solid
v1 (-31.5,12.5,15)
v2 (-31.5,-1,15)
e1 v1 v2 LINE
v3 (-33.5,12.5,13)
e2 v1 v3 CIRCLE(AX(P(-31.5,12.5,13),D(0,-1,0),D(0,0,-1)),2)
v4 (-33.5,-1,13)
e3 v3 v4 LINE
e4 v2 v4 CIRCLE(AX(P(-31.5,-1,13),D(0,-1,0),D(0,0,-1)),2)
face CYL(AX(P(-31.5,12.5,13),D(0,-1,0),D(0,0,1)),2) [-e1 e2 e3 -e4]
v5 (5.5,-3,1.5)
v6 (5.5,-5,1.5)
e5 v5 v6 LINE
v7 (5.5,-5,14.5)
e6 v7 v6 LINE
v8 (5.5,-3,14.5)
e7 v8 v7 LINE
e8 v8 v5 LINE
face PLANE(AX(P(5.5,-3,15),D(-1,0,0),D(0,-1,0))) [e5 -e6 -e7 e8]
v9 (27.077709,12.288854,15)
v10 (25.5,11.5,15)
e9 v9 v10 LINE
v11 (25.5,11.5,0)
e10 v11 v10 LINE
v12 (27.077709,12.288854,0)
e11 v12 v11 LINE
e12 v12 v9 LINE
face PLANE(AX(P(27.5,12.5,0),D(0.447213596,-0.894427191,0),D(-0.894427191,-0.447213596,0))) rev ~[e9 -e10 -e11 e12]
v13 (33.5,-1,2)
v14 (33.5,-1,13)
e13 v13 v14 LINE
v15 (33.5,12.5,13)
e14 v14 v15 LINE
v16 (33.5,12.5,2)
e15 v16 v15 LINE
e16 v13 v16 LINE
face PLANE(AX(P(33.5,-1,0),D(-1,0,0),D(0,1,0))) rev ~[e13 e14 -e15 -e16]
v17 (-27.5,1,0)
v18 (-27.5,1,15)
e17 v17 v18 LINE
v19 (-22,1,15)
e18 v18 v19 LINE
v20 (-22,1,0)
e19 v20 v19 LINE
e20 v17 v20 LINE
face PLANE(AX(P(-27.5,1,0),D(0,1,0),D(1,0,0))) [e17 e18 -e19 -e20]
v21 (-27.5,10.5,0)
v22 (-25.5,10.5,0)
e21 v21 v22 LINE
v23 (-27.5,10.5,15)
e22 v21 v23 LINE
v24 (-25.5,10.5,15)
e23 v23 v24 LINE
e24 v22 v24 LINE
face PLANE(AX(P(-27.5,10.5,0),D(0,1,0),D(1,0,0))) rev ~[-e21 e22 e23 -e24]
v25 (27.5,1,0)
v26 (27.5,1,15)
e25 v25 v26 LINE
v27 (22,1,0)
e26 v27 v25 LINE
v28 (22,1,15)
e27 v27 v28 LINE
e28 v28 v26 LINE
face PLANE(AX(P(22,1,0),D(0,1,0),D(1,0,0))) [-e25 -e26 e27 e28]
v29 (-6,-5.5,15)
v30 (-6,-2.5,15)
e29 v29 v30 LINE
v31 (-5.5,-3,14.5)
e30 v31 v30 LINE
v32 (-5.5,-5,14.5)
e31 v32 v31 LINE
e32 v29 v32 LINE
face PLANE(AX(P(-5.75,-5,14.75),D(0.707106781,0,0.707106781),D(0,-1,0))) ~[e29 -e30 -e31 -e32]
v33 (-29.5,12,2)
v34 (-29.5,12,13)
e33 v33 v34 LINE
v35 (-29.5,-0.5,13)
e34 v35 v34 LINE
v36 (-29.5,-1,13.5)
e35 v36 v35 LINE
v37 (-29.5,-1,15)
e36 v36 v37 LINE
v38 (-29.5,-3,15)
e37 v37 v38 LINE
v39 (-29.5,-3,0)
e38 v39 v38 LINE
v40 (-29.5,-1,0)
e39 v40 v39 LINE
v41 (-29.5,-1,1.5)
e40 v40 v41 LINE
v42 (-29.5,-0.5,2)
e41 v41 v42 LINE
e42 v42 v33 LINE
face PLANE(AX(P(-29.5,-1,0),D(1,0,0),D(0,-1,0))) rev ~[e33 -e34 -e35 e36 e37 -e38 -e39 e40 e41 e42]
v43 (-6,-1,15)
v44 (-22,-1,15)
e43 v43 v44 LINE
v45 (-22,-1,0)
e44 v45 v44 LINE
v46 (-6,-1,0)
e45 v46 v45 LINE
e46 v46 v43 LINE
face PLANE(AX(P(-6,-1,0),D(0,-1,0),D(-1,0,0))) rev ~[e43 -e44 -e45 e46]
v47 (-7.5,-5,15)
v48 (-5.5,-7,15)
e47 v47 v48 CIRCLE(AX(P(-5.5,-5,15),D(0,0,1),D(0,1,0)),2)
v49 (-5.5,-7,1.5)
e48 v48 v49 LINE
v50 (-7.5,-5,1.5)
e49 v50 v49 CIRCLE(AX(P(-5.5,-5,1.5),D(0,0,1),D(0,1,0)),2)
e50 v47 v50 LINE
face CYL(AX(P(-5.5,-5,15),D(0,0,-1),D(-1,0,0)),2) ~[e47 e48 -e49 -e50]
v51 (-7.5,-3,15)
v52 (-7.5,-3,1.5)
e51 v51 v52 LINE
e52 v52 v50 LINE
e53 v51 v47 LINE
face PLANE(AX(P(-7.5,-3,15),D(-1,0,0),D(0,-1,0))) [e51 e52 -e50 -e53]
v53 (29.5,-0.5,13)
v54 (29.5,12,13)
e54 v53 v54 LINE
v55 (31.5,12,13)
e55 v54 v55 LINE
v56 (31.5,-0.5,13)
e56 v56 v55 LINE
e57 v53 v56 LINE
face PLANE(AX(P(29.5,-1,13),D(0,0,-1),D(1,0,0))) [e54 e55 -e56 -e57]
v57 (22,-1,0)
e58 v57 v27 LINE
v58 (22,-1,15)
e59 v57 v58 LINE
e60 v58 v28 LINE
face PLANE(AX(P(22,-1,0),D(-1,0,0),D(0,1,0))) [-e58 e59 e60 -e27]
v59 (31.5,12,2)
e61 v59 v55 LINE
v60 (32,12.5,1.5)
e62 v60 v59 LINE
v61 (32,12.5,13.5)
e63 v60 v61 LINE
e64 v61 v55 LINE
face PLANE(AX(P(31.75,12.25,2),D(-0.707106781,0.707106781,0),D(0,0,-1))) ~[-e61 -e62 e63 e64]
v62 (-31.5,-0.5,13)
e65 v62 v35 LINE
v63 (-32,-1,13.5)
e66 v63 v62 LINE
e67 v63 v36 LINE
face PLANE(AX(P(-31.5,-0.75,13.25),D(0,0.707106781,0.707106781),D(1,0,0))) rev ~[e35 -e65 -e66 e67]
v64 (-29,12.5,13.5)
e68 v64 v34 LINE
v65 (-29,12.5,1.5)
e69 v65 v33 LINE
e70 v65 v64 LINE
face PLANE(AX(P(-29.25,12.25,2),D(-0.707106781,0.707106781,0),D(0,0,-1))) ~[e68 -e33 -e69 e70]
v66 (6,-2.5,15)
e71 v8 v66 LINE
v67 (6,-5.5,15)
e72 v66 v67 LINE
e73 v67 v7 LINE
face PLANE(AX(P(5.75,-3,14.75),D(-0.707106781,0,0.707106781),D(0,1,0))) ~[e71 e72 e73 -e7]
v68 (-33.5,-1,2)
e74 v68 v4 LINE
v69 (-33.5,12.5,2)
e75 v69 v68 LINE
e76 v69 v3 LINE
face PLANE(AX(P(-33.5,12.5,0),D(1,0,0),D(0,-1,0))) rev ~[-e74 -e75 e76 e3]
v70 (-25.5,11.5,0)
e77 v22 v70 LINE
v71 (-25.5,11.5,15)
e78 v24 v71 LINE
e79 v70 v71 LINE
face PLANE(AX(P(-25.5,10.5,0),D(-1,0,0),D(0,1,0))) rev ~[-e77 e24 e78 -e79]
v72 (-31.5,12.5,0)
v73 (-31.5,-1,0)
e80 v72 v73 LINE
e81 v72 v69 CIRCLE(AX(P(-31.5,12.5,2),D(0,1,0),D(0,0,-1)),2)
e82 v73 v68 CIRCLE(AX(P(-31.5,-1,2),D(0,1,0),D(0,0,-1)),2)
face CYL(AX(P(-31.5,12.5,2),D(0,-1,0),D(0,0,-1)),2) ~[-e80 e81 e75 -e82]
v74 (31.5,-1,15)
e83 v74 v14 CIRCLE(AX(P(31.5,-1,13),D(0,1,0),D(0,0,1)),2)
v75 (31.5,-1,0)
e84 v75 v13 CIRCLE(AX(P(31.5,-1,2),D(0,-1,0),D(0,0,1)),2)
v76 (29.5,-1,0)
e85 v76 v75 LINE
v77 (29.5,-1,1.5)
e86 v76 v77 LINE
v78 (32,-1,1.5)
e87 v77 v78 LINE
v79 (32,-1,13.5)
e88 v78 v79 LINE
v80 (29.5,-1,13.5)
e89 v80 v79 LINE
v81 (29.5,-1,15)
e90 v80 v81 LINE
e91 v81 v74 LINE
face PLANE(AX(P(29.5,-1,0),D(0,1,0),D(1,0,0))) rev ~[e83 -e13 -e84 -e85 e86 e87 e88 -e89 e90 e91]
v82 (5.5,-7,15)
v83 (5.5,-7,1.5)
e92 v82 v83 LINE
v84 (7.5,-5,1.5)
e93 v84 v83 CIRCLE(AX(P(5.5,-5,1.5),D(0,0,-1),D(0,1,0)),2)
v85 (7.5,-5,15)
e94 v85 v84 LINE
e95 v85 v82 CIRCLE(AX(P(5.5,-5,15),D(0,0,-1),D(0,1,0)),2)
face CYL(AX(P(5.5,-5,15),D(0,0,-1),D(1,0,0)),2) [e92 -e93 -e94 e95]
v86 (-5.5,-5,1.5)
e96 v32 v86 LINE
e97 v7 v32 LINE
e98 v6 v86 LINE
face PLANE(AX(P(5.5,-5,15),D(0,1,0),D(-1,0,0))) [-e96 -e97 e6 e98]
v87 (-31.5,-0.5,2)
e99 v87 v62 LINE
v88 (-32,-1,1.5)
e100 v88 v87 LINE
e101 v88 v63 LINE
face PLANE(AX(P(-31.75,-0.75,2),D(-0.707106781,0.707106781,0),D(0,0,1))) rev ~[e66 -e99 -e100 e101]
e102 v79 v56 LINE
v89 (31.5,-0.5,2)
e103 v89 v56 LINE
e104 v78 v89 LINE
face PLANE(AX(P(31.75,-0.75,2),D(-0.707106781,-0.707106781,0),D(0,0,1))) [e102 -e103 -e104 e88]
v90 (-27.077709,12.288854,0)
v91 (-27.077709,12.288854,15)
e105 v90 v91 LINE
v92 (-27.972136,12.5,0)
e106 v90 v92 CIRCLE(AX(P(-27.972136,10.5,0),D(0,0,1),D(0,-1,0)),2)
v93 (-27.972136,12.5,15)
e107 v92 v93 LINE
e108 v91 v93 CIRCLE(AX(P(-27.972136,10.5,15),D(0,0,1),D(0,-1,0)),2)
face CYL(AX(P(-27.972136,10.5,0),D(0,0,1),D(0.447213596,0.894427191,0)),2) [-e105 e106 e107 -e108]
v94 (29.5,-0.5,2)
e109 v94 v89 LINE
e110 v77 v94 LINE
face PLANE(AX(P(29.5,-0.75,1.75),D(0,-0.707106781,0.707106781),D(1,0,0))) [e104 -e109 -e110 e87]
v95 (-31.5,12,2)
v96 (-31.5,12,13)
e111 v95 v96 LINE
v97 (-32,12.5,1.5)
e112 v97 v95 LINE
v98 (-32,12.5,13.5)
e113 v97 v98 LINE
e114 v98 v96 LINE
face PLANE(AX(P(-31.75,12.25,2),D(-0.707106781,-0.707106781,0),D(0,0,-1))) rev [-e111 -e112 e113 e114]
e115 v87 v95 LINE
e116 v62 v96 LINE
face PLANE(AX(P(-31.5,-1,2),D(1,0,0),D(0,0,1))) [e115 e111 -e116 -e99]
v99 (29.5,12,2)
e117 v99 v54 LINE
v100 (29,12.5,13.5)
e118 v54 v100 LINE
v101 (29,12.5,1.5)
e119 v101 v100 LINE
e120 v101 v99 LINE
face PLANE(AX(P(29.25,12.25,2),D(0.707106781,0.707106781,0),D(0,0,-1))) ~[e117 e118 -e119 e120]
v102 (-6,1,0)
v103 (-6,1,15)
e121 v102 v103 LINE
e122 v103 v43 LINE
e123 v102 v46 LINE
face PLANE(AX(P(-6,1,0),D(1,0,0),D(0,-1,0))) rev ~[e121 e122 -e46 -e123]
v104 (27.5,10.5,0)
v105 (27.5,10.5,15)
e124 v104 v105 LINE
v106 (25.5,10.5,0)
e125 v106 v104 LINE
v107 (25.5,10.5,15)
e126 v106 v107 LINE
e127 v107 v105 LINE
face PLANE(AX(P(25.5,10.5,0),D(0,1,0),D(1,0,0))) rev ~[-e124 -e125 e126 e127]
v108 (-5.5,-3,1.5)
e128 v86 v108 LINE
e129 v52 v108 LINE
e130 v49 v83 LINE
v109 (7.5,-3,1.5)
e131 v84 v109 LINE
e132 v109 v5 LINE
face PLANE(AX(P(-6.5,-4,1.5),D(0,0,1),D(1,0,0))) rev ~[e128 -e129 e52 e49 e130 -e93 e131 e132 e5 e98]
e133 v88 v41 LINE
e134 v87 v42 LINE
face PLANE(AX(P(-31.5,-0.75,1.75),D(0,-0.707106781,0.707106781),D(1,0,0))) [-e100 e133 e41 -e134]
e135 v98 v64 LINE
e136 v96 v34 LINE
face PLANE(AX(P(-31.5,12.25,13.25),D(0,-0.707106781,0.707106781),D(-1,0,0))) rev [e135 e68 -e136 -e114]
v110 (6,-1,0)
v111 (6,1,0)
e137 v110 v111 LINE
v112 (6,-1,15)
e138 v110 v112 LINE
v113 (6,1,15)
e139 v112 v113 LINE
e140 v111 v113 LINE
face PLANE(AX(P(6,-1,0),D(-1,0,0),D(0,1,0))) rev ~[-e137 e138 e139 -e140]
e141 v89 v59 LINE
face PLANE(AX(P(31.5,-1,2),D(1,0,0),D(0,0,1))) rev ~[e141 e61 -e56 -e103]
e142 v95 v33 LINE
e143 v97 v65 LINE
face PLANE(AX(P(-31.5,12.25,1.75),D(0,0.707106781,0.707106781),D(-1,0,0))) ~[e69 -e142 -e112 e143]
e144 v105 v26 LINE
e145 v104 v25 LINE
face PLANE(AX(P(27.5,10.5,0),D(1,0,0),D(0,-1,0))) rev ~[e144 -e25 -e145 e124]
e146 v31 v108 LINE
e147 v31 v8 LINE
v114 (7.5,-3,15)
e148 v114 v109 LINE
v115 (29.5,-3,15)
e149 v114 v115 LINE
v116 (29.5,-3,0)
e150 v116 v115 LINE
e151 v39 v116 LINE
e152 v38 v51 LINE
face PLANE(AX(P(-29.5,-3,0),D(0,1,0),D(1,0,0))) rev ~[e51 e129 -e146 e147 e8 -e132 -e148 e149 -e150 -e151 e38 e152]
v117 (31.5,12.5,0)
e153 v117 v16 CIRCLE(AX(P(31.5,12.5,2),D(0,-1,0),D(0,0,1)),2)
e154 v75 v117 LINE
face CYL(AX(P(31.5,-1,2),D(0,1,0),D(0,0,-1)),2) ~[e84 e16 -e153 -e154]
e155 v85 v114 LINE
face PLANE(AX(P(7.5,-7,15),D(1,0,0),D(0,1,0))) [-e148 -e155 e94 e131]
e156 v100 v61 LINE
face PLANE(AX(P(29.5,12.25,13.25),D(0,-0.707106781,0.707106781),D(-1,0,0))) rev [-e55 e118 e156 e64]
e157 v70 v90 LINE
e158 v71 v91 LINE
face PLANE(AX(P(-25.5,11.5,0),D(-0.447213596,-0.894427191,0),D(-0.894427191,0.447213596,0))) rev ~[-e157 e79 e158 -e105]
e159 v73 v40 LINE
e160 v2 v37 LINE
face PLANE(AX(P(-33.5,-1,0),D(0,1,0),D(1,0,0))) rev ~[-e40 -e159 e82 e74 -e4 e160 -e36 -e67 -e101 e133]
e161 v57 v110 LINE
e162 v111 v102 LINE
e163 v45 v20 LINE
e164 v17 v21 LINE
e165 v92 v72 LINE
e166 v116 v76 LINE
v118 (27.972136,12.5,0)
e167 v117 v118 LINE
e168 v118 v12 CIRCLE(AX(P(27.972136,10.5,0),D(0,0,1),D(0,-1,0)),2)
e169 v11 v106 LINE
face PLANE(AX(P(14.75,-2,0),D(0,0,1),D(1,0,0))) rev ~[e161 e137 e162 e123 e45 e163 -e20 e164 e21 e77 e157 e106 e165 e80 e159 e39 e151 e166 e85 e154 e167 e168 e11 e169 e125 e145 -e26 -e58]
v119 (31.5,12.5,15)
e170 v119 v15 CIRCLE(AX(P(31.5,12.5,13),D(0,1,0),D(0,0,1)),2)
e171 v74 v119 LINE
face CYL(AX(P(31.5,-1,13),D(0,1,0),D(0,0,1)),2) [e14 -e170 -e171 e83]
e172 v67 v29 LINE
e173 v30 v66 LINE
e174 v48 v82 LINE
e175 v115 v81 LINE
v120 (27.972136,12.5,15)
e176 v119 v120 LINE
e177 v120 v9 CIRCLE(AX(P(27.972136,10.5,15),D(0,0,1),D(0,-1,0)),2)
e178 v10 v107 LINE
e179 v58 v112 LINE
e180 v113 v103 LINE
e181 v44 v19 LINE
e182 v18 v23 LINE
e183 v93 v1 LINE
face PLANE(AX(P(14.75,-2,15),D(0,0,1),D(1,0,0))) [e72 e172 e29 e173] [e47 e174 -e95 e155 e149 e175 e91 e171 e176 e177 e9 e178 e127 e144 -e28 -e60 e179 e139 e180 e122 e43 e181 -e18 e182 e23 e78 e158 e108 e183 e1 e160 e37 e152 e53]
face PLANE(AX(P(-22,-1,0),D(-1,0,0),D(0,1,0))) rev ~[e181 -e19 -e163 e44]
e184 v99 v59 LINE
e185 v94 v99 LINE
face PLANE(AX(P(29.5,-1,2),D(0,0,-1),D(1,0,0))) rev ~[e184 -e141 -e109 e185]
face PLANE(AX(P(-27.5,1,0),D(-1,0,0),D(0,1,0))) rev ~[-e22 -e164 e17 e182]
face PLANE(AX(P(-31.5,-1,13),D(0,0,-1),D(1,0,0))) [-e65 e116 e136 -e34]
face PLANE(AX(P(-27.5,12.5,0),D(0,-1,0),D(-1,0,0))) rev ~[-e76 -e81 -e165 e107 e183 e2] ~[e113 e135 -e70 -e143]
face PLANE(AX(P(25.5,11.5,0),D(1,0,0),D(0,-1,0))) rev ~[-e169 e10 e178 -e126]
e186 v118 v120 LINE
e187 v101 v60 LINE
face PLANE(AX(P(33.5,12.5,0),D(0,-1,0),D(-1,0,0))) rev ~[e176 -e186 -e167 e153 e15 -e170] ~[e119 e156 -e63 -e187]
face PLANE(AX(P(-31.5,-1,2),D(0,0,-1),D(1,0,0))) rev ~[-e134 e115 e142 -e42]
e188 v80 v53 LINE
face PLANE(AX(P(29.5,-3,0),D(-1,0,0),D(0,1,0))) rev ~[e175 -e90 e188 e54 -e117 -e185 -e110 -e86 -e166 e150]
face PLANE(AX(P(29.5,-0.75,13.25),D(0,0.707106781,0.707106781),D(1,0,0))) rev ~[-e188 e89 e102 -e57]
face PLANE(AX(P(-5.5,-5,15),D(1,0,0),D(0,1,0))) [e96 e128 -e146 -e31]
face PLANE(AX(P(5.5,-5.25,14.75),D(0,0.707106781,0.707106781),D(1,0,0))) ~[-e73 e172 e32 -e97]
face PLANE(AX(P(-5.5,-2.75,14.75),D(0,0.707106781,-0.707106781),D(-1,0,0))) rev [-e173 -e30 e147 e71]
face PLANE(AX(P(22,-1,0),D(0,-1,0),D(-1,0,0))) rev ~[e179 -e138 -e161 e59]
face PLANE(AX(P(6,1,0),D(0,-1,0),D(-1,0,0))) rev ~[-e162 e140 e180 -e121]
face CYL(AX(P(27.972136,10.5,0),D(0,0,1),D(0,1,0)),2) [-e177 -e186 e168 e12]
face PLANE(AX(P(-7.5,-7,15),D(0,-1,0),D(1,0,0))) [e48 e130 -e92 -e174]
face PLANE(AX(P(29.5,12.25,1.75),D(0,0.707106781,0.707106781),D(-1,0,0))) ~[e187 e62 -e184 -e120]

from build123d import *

# Parameters (mm, degrees)
F0_W     = 5.5
F0_H     = 2
F1_DEPTH = 15
F2_W     = 2
F2_H     = 11
F3_DEPTH = 13.501
F4_W     = 2
F4_H     = 2
F5_DEPTH = 13.5
F6_R     = 2
F7_SIZE  = 0.5


with BuildPart() as f1:
    # F0 (on Top) → F1 (new body)
    with BuildSketch(Plane.XY):
        Polygon((29.5, -1), (27.5, -1), (22, -1), (6, -1), (0, -1), (0, -3), (29.5, -3), align=None)
        with Locations((24.75, 0)):
            Rectangle(F0_W, F0_H)
        Polygon((27.5, 1), (27.5, -1), (29.5, -1), (29.5, 10.5), (27.5, 10.5), align=None)
        Polygon((29.5, 10.5), (29.5, -1), (33.5, -1), (33.5, 12.5), (29.5, 12.5), align=None)
        Polygon((0, -1), (6, -1), (6, 1), (-6, 1), (-6, -1), align=None)
        Polygon((25.5, 10.5), (27.5, 10.5), (29.5, 10.5), (29.5, 12.5), (27.5, 12.5), (25.5, 11.5), align=None)
        Polygon((0, -3), (0, -1), (-6, -1), (-22, -1), (-27.5, -1), (-29.5, -1), (-29.5, -3), align=None)
        with Locations((-24.75, 0)):
            Rectangle(F0_W, F0_H)
        Polygon((-29.5, 10.5), (-29.5, -1), (-27.5, -1), (-27.5, 1), (-27.5, 10.5), align=None)
        Polygon((-33.5, -1), (-29.5, -1), (-29.5, 10.5), (-29.5, 12.5), (-33.5, 12.5), align=None)
        Polygon((-29.5, 12.5), (-29.5, 10.5), (-27.5, 10.5), (-25.5, 10.5), (-25.5, 11.5), (-27.5, 12.5), align=None)
    extrude(amount=F1_DEPTH)

    # F2 (on face) → F3 (cut, through all)
    with BuildSketch(Plane.XZ.offset(1)):
        with Locations((-30.5, 7.5)):
            Rectangle(F2_W, F2_H)
        with Locations((30.5, 7.5)):
            Rectangle(F2_W, F2_H)
    extrude(amount=-F3_DEPTH, mode=Mode.SUBTRACT)

    # F4 (on face) → F5 (join)
    with BuildSketch(Plane.XY.offset(15)):
        with Locations((-6.5, -4)):
            Rectangle(F4_W, F4_H)
        Polygon((7.5, -7), (7.5, -3), (5.5, -3), (5.5, -5), (-5.5, -5), (-7.5, -5), (-7.5, -7), align=None)
    extrude(amount=-F5_DEPTH)

    # F6
    f6_edges = [f1.edges().sort_by_distance(p)[0] for p in [
        (33.5, 5.75, 15),
        (-33.5, 5.75, 15),
        (33.5, 5.75, 0),
        (-33.5, 5.75, 0),
        (-27.5, 12.5, 7.5),
        (27.5, 12.5, 7.5),
        (-7.5, -7, 8.25),
        (7.5, -7, 8.25),
    ]]
    fillet(f6_edges, radius=F6_R)

    # F7
    f7_edges = [f1.edges().sort_by_distance(p)[0] for p in [
        (-31.5, -1, 7.5),
        (-30.5, -1, 13),
        (-30.5, -1, 2),
        (31.5, -1, 7.5),
        (30.5, -1, 13),
        (30.5, -1, 2),
        (31.5, 12.5, 7.5),
        (30.5, 12.5, 2),
        (29.5, 12.5, 7.5),
        (30.5, 12.5, 13),
        (-30.5, 12.5, 2),
        (-29.5, 12.5, 7.5),
        (-31.5, 12.5, 7.5),
        (-30.5, 12.5, 13),
        (0, -3, 15),
        (-5.5, -4, 15),
        (0, -5, 15),
        (5.5, -4, 15),
    ]]
    chamfer(f7_edges, length=F7_SIZE)


solid = f1.part
